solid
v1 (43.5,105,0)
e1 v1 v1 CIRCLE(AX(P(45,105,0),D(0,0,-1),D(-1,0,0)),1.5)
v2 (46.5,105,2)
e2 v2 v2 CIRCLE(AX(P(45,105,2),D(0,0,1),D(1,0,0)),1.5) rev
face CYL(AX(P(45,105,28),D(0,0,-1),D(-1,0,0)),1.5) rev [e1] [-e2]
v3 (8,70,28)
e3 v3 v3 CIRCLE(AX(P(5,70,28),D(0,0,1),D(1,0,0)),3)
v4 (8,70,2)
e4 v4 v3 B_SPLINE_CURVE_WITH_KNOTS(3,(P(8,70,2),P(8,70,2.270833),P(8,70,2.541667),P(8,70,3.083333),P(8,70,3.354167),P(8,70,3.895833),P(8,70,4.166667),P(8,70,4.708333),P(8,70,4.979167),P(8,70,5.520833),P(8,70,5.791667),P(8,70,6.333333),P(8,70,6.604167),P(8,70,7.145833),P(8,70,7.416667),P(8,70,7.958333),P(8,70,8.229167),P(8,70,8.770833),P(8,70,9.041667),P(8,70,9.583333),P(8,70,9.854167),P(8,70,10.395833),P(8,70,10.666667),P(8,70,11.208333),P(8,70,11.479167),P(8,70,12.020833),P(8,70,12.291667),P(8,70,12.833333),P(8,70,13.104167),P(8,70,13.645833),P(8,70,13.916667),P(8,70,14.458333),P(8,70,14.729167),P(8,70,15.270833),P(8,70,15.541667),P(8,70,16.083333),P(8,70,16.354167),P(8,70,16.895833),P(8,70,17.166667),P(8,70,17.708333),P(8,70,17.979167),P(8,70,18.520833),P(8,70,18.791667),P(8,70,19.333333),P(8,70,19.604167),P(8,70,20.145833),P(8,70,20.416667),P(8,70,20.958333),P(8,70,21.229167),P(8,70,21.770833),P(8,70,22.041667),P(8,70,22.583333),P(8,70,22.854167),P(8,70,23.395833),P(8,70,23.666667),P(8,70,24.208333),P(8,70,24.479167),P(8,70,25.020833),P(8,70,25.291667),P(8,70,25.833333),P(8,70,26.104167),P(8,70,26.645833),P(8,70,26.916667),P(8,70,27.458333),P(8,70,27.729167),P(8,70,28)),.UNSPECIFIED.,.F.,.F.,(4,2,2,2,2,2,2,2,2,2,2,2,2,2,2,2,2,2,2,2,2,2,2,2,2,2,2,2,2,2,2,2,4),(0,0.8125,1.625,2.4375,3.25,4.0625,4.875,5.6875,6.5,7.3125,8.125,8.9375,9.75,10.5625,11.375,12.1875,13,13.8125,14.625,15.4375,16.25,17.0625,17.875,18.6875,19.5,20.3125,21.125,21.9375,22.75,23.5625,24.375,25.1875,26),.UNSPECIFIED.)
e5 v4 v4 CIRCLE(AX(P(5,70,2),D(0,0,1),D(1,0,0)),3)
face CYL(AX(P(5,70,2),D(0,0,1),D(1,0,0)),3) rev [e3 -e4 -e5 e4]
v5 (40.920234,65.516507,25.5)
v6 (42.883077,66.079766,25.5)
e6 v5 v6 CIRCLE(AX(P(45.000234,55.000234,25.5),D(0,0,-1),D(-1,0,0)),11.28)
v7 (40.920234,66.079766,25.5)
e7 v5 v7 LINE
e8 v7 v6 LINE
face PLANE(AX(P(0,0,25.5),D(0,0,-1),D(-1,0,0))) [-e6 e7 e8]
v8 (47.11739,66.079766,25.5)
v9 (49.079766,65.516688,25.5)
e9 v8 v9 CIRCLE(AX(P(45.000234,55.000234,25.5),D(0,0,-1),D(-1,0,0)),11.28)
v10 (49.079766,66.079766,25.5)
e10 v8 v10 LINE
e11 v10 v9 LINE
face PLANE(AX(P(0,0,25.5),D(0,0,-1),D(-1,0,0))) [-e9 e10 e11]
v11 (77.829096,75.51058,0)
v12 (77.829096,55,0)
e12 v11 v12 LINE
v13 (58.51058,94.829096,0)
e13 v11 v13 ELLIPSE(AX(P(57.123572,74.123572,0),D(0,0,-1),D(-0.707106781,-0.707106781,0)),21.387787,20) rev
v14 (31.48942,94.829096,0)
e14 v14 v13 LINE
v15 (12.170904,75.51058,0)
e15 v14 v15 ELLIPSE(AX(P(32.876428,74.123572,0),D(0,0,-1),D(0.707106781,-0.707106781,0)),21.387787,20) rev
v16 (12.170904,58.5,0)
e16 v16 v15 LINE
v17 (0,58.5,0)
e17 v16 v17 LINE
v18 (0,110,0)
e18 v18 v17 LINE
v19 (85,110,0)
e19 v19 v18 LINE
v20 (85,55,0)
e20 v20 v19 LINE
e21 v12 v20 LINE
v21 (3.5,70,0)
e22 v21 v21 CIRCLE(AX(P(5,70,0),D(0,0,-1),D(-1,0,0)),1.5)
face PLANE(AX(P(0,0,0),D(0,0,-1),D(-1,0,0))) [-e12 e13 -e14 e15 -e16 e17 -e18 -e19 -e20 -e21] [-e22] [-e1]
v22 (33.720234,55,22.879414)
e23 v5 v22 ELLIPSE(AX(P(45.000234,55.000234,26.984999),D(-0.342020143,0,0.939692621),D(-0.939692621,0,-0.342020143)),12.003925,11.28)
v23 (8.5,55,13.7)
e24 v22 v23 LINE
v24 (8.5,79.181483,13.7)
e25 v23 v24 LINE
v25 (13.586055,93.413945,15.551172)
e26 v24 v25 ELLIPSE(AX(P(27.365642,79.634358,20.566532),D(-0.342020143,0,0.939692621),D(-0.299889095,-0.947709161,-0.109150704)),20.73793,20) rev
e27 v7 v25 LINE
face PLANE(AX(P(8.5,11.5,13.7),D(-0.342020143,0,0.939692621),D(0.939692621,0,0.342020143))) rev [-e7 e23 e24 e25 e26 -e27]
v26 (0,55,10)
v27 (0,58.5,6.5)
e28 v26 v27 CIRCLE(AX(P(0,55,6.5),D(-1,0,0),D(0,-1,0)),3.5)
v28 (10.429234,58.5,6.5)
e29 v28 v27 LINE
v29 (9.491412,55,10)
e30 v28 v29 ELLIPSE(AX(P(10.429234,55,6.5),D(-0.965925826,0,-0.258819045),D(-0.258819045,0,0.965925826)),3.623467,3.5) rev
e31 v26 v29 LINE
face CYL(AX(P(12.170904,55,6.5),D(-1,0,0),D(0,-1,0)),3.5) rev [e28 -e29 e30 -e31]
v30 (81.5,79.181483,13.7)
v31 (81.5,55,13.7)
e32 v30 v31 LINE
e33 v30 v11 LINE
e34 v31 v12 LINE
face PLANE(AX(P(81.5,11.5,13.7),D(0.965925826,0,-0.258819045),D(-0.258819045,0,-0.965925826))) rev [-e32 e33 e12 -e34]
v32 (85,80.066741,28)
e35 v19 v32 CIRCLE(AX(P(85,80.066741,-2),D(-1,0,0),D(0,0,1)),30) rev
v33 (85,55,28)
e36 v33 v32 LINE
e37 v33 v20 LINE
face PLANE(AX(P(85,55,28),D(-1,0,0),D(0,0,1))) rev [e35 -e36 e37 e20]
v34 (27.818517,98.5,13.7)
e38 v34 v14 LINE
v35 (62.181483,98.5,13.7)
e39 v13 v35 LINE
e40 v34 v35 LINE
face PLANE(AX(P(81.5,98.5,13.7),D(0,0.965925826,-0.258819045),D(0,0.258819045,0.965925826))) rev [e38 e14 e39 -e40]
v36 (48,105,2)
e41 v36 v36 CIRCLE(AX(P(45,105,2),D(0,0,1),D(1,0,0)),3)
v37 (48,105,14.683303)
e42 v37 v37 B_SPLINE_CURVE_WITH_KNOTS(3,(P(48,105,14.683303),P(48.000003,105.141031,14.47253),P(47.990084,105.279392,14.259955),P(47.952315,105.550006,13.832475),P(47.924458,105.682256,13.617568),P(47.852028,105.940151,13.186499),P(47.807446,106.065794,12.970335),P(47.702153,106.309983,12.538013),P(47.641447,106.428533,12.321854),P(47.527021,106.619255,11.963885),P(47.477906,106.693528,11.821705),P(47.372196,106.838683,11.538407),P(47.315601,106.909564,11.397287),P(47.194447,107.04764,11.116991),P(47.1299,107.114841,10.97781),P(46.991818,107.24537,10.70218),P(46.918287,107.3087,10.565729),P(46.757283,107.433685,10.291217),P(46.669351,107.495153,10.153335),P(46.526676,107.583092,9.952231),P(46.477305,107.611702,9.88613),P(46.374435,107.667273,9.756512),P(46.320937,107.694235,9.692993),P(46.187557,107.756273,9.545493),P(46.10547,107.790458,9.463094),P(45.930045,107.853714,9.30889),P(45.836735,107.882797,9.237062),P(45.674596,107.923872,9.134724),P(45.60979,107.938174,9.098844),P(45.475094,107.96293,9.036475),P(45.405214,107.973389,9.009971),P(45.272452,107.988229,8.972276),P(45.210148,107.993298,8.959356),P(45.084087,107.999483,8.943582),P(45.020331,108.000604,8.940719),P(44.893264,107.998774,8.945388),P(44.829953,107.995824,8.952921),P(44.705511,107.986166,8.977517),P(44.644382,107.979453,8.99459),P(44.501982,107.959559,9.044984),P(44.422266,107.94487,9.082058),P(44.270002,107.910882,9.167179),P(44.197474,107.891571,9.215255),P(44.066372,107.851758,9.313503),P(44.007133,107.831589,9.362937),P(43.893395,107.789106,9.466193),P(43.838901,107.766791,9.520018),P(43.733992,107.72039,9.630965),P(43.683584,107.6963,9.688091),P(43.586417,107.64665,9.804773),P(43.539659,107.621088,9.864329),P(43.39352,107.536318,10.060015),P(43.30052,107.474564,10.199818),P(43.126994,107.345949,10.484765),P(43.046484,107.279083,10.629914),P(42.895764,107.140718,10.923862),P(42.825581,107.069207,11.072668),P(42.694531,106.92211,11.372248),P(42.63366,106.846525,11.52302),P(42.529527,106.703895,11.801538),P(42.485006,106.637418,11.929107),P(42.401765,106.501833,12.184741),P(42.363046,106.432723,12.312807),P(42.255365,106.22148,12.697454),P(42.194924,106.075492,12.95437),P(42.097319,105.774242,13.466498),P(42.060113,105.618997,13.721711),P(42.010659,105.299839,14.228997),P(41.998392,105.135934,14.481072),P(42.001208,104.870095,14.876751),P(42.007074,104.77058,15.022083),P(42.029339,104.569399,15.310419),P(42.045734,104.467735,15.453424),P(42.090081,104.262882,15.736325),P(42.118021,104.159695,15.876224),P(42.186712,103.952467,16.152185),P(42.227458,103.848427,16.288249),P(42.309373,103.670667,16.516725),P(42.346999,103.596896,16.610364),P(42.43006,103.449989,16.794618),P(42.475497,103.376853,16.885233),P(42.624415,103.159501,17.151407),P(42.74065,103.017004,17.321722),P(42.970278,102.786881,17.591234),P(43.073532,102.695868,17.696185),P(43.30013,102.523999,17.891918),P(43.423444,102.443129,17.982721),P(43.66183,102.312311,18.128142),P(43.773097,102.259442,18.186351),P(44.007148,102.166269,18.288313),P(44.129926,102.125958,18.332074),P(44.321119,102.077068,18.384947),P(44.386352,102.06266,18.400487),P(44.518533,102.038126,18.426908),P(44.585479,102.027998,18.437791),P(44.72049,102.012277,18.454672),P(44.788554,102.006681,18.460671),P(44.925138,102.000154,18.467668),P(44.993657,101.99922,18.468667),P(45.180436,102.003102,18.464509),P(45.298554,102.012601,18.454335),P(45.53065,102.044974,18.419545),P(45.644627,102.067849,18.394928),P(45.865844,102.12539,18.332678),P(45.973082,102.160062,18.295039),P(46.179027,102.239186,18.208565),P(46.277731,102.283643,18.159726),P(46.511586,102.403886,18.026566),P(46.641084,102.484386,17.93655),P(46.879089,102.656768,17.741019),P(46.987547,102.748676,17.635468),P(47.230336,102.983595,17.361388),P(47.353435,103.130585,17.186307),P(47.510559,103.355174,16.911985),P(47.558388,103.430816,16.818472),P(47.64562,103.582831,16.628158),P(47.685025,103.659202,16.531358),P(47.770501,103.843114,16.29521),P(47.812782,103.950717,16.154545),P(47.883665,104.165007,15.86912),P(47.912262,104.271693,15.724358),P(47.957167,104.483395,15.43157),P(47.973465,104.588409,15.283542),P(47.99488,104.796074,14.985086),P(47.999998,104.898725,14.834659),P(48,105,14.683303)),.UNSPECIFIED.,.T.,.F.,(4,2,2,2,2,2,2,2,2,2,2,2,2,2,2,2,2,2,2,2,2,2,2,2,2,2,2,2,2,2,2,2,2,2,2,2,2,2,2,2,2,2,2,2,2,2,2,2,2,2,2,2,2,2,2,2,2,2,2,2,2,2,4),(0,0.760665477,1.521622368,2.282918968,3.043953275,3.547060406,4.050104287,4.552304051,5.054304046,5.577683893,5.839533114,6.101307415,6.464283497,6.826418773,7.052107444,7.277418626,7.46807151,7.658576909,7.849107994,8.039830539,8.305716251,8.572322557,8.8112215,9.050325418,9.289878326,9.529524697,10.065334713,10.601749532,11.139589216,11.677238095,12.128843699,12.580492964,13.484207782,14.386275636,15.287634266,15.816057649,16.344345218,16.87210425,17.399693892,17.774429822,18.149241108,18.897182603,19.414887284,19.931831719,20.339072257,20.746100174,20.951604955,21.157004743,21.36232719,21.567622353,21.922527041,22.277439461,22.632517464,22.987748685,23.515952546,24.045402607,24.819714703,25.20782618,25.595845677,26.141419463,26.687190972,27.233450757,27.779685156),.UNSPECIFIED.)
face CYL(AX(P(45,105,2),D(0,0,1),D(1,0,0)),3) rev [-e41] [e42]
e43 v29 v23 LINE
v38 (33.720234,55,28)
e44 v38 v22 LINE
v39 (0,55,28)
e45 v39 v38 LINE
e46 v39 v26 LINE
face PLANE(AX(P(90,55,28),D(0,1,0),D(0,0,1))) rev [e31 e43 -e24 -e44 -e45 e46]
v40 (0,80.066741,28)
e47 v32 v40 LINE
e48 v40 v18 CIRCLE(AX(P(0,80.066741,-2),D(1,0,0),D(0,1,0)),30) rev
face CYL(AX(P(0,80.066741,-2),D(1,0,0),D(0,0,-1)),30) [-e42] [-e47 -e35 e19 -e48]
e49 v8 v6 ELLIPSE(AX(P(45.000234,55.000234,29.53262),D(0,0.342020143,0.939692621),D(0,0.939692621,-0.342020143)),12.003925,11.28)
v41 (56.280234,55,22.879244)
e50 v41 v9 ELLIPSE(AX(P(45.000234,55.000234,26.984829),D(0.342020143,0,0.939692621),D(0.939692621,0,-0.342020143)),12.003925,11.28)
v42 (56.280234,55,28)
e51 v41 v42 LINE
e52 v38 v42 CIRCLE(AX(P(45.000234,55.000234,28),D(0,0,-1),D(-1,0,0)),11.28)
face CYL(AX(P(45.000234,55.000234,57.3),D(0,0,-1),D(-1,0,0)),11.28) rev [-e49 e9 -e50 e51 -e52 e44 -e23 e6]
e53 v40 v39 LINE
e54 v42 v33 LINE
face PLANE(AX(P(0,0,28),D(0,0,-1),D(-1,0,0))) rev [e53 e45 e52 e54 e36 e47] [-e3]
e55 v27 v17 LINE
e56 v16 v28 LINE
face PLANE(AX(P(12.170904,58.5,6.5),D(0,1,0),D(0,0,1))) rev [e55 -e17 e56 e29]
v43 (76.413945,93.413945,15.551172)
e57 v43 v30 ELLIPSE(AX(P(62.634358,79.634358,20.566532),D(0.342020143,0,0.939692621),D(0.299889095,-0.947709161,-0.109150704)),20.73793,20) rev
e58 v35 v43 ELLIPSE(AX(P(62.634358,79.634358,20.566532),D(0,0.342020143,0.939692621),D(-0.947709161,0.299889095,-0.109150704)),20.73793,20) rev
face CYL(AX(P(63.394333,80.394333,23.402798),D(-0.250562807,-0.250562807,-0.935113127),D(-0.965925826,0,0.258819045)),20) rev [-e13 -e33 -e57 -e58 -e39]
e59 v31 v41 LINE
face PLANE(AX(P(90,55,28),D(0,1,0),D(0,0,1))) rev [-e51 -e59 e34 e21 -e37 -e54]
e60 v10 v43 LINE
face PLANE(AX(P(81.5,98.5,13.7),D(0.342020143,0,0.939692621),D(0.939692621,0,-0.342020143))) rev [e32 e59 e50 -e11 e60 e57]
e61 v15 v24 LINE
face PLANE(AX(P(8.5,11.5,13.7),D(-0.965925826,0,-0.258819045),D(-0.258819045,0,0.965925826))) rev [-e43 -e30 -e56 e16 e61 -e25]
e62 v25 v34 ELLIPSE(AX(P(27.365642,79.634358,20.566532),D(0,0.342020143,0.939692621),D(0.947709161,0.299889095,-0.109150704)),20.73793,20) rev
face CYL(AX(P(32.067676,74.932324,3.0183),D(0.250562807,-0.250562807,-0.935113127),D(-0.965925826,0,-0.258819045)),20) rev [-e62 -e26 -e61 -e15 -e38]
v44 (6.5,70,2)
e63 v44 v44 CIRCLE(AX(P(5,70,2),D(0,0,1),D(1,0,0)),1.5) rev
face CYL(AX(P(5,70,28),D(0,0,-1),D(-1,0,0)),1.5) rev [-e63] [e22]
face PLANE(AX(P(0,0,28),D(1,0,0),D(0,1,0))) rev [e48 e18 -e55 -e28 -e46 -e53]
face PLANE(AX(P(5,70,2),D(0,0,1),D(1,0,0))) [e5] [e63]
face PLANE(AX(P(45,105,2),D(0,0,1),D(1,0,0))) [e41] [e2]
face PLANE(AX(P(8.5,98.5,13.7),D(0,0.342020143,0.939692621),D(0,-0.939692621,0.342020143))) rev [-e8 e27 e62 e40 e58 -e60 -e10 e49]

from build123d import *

# Parameters (mm, degrees)
SKETCH1_W           = 90
SKETCH1_H           = 110
BOSS_EXTRUDE1_DEPTH = 28
FILLET2_R           = 30
SKETCH3_R           = 1.5
CUT_EXTRUDE1_DEPTH  = 145.858551698
SKETCH4_R           = 3
CUT_EXTRUDE4_DEPTH  = 26
CUT_EXTRUDE5_START  = -13.7
SKETCH5_W           = 73
SKETCH5_H           = 87
CUT_EXTRUDE5_DEPTH  = 13.7
CUT_EXTRUDE5_TAPER  = 15
SKETCH8_W           = 73
SKETCH8_H           = 87
CUT_EXTRUDE8_DEPTH  = 11.8
CUT_EXTRUDE8_DRAFT  = -70
CUT_EXTRUDE9_START  = 30
SKETCH9_R           = 11.28
CUT_EXTRUDE9_DEPTH  = 61.8
FILLET19_R          = 20
SKETCH13_W          = 90
SKETCH13_H          = 55
CUT_EXTRUDE10_DEPTH = 145.858551855
CUT_EXTRUDE12_REACH = 146.859
SKETCH15_W          = 5
SKETCH15_H          = 55
CUT_EXTRUDE13_DEPTH = 145.858551855


with BuildPart() as part:
    # Sketch1 → Boss-Extrude1 (new body)
    with BuildSketch(Plane.XY):
        with Locations((45, 55)):
            Rectangle(SKETCH1_W, SKETCH1_H)
    extrude(amount=BOSS_EXTRUDE1_DEPTH)

    # Fillet2
    # the kernel refuses this fillet: 30 mm, written as the material it takes off along each edge
    with BuildSketch(Plane(origin=(-74.833147735, 0, 28), x_dir=(0, 0, -1), z_dir=(1, 0, 0)), Plane(origin=(164.833147735, 110, 28), x_dir=(0, 0, -1), z_dir=(-1, 0, 0))) as fillet2_piece_1:
        with BuildLine():
            CenterArc((30, 29.933259094), FILLET2_R, 180, 86.177446271)
            Line((0, 29.933259094), (-0.6, 29.933259094))
            Line((-0.6, 29.933259094), (-0.6, 0))
            Line((-0.6, 0), (0, -0.6))
            ThreePointArc((0, -0.6), (14, -0.6), (27.96, -0.598665182))
            Line((27.96, -0.598665182), (28, 0))
        make_face()
    extrude(amount=239.666295471, mode=Mode.SUBTRACT)

    # Sketch3 → Cut-Extrude1 (cut, through all)
    with BuildSketch(Plane(origin=(0, 0, 0), x_dir=(-1, 0, 0), z_dir=(0, 0, -1))):
        with Locations((-45, 105)):
            Circle(SKETCH3_R)
        with Locations((-45, 5)):
            Circle(SKETCH3_R)
        with Locations((-5, 70)):
            Circle(SKETCH3_R)
        with Locations((-5, 40)):
            Circle(SKETCH3_R)
    extrude(amount=-CUT_EXTRUDE1_DEPTH, mode=Mode.SUBTRACT)

    # Sketch4 → Cut-Extrude4 (cut)
    with BuildSketch(Plane.XY.offset(28)):
        with Locations((45, 105)):
            Circle(SKETCH4_R)
        with Locations((45, 5)):
            Circle(SKETCH4_R)
        with Locations((5, 70)):
            Circle(SKETCH4_R)
        with Locations((5, 40)):
            Circle(SKETCH4_R)
    extrude(amount=-CUT_EXTRUDE4_DEPTH, mode=Mode.SUBTRACT)

    # Sketch5 → Cut-Extrude5 (cut)
    with BuildSketch(Plane(origin=(0, 0, 0), x_dir=(-1, 0, 0), z_dir=(0, 0, -1)).offset(CUT_EXTRUDE5_START)):
        with Locations((-45, 55)):
            Rectangle(SKETCH5_W, SKETCH5_H)
    extrude(amount=CUT_EXTRUDE5_DEPTH, taper=CUT_EXTRUDE5_TAPER, mode=Mode.SUBTRACT)


with BuildPart() as cut_extrude8_tool:
    # Sketch8 → Cut-Extrude8 (with draft: the straight prism first)
    with BuildSketch(Plane(origin=(0, 0, 13.7), x_dir=(-1, 0, 0), z_dir=(0, 0, -1))):
        with Locations((-45, 55)):
            Rectangle(SKETCH8_W, SKETCH8_H)
    extrude(amount=-CUT_EXTRUDE8_DEPTH)
    # Cut-Extrude8: the draft: its side faces are tilted about the plane it starts from
    cut_extrude8_sides = [cut_extrude8_tool.faces().sort_by_distance(p)[0] for p in [
        (81.5, 55, 19.6),
        (45, 11.5, 19.6),
        (8.5, 55, 19.6),
        (45, 98.5, 19.6),
    ]]
    draft(cut_extrude8_sides, Plane(origin=(0, 0, 13.7), x_dir=(-1, 0, 0), z_dir=(0, 0, -1)), CUT_EXTRUDE8_DRAFT)


with BuildPart() as part_1:
    add(part.part)

    # Cut-Extrude8: cut by cut_extrude8_tool
    add(cut_extrude8_tool.part, mode=Mode.SUBTRACT)

    # Sketch9 → Cut-Extrude9 (cut)
    with BuildSketch(Plane(origin=(0, 0, 25.5), x_dir=(-1, 0, 0), z_dir=(0, 0, -1)).offset(CUT_EXTRUDE9_START)):
        with Locations((-45.00023355, 55.00023355)):
            Circle(SKETCH9_R)
    extrude(amount=-CUT_EXTRUDE9_DEPTH, mode=Mode.SUBTRACT)

    # Fillet19
    fillet19_edges = [part_1.edges().sort_by_distance(p)[0] for p in [
        (79.664548032, 96.664548032, 6.85),
        (79.664548032, 13.335451968, 6.85),
        (10.335451968, 13.335451968, 6.85),
        (10.335451968, 96.664548032, 6.85),
    ]]
    fillet(fillet19_edges, radius=FILLET19_R)

    # Sketch13 → Cut-Extrude10 (cut, through all)
    with BuildSketch(Plane(origin=(0, 0, 0), x_dir=(-1, 0, 0), z_dir=(0, 0, -1))):
        with Locations((-45, 27.5)):
            Rectangle(SKETCH13_W, SKETCH13_H)
    extrude(amount=-CUT_EXTRUDE10_DEPTH, mode=Mode.SUBTRACT)

    # Cut-Extrude12: up to this plane
    cut_extrude12_end = Plane(origin=(8.5, 11.5, 13.7), z_dir=(-0.9659258262890681, 0, -0.25881904510252135))
    # Sketch14 → Cut-Extrude12 (cut, up to the surface)
    with BuildSketch(Plane.ZY, mode=Mode.PRIVATE) as cut_extrude12_sk1:
        with BuildLine():
            Line((6.5, 58.5), (0, 58.5))
            Line((0, 58.5), (0, 51.5))
            Line((0, 51.5), (6.5, 51.5))
            ThreePointArc((6.5, 51.5), (10, 55), (6.5, 58.5))
        make_face()
    cut_extrude12_tool1 = split(extrude(cut_extrude12_sk1.sketch, amount=-CUT_EXTRUDE12_REACH, mode=Mode.PRIVATE), bisect_by=cut_extrude12_end, keep=Keep.BOTH, mode=Mode.PRIVATE)
    add(cut_extrude12_tool1.solids().sort_by_distance((0, 55, 4.657437))[0], mode=Mode.SUBTRACT)

    # Sketch15 → Cut-Extrude13 (cut, through all)
    with BuildSketch(Plane(origin=(0, 0, 0), x_dir=(-1, 0, 0), z_dir=(0, 0, -1))):
        with Locations((-87.5, 82.5)):
            Rectangle(SKETCH15_W, SKETCH15_H)
    extrude(amount=-CUT_EXTRUDE13_DEPTH, mode=Mode.SUBTRACT)


solid = part_1.part
